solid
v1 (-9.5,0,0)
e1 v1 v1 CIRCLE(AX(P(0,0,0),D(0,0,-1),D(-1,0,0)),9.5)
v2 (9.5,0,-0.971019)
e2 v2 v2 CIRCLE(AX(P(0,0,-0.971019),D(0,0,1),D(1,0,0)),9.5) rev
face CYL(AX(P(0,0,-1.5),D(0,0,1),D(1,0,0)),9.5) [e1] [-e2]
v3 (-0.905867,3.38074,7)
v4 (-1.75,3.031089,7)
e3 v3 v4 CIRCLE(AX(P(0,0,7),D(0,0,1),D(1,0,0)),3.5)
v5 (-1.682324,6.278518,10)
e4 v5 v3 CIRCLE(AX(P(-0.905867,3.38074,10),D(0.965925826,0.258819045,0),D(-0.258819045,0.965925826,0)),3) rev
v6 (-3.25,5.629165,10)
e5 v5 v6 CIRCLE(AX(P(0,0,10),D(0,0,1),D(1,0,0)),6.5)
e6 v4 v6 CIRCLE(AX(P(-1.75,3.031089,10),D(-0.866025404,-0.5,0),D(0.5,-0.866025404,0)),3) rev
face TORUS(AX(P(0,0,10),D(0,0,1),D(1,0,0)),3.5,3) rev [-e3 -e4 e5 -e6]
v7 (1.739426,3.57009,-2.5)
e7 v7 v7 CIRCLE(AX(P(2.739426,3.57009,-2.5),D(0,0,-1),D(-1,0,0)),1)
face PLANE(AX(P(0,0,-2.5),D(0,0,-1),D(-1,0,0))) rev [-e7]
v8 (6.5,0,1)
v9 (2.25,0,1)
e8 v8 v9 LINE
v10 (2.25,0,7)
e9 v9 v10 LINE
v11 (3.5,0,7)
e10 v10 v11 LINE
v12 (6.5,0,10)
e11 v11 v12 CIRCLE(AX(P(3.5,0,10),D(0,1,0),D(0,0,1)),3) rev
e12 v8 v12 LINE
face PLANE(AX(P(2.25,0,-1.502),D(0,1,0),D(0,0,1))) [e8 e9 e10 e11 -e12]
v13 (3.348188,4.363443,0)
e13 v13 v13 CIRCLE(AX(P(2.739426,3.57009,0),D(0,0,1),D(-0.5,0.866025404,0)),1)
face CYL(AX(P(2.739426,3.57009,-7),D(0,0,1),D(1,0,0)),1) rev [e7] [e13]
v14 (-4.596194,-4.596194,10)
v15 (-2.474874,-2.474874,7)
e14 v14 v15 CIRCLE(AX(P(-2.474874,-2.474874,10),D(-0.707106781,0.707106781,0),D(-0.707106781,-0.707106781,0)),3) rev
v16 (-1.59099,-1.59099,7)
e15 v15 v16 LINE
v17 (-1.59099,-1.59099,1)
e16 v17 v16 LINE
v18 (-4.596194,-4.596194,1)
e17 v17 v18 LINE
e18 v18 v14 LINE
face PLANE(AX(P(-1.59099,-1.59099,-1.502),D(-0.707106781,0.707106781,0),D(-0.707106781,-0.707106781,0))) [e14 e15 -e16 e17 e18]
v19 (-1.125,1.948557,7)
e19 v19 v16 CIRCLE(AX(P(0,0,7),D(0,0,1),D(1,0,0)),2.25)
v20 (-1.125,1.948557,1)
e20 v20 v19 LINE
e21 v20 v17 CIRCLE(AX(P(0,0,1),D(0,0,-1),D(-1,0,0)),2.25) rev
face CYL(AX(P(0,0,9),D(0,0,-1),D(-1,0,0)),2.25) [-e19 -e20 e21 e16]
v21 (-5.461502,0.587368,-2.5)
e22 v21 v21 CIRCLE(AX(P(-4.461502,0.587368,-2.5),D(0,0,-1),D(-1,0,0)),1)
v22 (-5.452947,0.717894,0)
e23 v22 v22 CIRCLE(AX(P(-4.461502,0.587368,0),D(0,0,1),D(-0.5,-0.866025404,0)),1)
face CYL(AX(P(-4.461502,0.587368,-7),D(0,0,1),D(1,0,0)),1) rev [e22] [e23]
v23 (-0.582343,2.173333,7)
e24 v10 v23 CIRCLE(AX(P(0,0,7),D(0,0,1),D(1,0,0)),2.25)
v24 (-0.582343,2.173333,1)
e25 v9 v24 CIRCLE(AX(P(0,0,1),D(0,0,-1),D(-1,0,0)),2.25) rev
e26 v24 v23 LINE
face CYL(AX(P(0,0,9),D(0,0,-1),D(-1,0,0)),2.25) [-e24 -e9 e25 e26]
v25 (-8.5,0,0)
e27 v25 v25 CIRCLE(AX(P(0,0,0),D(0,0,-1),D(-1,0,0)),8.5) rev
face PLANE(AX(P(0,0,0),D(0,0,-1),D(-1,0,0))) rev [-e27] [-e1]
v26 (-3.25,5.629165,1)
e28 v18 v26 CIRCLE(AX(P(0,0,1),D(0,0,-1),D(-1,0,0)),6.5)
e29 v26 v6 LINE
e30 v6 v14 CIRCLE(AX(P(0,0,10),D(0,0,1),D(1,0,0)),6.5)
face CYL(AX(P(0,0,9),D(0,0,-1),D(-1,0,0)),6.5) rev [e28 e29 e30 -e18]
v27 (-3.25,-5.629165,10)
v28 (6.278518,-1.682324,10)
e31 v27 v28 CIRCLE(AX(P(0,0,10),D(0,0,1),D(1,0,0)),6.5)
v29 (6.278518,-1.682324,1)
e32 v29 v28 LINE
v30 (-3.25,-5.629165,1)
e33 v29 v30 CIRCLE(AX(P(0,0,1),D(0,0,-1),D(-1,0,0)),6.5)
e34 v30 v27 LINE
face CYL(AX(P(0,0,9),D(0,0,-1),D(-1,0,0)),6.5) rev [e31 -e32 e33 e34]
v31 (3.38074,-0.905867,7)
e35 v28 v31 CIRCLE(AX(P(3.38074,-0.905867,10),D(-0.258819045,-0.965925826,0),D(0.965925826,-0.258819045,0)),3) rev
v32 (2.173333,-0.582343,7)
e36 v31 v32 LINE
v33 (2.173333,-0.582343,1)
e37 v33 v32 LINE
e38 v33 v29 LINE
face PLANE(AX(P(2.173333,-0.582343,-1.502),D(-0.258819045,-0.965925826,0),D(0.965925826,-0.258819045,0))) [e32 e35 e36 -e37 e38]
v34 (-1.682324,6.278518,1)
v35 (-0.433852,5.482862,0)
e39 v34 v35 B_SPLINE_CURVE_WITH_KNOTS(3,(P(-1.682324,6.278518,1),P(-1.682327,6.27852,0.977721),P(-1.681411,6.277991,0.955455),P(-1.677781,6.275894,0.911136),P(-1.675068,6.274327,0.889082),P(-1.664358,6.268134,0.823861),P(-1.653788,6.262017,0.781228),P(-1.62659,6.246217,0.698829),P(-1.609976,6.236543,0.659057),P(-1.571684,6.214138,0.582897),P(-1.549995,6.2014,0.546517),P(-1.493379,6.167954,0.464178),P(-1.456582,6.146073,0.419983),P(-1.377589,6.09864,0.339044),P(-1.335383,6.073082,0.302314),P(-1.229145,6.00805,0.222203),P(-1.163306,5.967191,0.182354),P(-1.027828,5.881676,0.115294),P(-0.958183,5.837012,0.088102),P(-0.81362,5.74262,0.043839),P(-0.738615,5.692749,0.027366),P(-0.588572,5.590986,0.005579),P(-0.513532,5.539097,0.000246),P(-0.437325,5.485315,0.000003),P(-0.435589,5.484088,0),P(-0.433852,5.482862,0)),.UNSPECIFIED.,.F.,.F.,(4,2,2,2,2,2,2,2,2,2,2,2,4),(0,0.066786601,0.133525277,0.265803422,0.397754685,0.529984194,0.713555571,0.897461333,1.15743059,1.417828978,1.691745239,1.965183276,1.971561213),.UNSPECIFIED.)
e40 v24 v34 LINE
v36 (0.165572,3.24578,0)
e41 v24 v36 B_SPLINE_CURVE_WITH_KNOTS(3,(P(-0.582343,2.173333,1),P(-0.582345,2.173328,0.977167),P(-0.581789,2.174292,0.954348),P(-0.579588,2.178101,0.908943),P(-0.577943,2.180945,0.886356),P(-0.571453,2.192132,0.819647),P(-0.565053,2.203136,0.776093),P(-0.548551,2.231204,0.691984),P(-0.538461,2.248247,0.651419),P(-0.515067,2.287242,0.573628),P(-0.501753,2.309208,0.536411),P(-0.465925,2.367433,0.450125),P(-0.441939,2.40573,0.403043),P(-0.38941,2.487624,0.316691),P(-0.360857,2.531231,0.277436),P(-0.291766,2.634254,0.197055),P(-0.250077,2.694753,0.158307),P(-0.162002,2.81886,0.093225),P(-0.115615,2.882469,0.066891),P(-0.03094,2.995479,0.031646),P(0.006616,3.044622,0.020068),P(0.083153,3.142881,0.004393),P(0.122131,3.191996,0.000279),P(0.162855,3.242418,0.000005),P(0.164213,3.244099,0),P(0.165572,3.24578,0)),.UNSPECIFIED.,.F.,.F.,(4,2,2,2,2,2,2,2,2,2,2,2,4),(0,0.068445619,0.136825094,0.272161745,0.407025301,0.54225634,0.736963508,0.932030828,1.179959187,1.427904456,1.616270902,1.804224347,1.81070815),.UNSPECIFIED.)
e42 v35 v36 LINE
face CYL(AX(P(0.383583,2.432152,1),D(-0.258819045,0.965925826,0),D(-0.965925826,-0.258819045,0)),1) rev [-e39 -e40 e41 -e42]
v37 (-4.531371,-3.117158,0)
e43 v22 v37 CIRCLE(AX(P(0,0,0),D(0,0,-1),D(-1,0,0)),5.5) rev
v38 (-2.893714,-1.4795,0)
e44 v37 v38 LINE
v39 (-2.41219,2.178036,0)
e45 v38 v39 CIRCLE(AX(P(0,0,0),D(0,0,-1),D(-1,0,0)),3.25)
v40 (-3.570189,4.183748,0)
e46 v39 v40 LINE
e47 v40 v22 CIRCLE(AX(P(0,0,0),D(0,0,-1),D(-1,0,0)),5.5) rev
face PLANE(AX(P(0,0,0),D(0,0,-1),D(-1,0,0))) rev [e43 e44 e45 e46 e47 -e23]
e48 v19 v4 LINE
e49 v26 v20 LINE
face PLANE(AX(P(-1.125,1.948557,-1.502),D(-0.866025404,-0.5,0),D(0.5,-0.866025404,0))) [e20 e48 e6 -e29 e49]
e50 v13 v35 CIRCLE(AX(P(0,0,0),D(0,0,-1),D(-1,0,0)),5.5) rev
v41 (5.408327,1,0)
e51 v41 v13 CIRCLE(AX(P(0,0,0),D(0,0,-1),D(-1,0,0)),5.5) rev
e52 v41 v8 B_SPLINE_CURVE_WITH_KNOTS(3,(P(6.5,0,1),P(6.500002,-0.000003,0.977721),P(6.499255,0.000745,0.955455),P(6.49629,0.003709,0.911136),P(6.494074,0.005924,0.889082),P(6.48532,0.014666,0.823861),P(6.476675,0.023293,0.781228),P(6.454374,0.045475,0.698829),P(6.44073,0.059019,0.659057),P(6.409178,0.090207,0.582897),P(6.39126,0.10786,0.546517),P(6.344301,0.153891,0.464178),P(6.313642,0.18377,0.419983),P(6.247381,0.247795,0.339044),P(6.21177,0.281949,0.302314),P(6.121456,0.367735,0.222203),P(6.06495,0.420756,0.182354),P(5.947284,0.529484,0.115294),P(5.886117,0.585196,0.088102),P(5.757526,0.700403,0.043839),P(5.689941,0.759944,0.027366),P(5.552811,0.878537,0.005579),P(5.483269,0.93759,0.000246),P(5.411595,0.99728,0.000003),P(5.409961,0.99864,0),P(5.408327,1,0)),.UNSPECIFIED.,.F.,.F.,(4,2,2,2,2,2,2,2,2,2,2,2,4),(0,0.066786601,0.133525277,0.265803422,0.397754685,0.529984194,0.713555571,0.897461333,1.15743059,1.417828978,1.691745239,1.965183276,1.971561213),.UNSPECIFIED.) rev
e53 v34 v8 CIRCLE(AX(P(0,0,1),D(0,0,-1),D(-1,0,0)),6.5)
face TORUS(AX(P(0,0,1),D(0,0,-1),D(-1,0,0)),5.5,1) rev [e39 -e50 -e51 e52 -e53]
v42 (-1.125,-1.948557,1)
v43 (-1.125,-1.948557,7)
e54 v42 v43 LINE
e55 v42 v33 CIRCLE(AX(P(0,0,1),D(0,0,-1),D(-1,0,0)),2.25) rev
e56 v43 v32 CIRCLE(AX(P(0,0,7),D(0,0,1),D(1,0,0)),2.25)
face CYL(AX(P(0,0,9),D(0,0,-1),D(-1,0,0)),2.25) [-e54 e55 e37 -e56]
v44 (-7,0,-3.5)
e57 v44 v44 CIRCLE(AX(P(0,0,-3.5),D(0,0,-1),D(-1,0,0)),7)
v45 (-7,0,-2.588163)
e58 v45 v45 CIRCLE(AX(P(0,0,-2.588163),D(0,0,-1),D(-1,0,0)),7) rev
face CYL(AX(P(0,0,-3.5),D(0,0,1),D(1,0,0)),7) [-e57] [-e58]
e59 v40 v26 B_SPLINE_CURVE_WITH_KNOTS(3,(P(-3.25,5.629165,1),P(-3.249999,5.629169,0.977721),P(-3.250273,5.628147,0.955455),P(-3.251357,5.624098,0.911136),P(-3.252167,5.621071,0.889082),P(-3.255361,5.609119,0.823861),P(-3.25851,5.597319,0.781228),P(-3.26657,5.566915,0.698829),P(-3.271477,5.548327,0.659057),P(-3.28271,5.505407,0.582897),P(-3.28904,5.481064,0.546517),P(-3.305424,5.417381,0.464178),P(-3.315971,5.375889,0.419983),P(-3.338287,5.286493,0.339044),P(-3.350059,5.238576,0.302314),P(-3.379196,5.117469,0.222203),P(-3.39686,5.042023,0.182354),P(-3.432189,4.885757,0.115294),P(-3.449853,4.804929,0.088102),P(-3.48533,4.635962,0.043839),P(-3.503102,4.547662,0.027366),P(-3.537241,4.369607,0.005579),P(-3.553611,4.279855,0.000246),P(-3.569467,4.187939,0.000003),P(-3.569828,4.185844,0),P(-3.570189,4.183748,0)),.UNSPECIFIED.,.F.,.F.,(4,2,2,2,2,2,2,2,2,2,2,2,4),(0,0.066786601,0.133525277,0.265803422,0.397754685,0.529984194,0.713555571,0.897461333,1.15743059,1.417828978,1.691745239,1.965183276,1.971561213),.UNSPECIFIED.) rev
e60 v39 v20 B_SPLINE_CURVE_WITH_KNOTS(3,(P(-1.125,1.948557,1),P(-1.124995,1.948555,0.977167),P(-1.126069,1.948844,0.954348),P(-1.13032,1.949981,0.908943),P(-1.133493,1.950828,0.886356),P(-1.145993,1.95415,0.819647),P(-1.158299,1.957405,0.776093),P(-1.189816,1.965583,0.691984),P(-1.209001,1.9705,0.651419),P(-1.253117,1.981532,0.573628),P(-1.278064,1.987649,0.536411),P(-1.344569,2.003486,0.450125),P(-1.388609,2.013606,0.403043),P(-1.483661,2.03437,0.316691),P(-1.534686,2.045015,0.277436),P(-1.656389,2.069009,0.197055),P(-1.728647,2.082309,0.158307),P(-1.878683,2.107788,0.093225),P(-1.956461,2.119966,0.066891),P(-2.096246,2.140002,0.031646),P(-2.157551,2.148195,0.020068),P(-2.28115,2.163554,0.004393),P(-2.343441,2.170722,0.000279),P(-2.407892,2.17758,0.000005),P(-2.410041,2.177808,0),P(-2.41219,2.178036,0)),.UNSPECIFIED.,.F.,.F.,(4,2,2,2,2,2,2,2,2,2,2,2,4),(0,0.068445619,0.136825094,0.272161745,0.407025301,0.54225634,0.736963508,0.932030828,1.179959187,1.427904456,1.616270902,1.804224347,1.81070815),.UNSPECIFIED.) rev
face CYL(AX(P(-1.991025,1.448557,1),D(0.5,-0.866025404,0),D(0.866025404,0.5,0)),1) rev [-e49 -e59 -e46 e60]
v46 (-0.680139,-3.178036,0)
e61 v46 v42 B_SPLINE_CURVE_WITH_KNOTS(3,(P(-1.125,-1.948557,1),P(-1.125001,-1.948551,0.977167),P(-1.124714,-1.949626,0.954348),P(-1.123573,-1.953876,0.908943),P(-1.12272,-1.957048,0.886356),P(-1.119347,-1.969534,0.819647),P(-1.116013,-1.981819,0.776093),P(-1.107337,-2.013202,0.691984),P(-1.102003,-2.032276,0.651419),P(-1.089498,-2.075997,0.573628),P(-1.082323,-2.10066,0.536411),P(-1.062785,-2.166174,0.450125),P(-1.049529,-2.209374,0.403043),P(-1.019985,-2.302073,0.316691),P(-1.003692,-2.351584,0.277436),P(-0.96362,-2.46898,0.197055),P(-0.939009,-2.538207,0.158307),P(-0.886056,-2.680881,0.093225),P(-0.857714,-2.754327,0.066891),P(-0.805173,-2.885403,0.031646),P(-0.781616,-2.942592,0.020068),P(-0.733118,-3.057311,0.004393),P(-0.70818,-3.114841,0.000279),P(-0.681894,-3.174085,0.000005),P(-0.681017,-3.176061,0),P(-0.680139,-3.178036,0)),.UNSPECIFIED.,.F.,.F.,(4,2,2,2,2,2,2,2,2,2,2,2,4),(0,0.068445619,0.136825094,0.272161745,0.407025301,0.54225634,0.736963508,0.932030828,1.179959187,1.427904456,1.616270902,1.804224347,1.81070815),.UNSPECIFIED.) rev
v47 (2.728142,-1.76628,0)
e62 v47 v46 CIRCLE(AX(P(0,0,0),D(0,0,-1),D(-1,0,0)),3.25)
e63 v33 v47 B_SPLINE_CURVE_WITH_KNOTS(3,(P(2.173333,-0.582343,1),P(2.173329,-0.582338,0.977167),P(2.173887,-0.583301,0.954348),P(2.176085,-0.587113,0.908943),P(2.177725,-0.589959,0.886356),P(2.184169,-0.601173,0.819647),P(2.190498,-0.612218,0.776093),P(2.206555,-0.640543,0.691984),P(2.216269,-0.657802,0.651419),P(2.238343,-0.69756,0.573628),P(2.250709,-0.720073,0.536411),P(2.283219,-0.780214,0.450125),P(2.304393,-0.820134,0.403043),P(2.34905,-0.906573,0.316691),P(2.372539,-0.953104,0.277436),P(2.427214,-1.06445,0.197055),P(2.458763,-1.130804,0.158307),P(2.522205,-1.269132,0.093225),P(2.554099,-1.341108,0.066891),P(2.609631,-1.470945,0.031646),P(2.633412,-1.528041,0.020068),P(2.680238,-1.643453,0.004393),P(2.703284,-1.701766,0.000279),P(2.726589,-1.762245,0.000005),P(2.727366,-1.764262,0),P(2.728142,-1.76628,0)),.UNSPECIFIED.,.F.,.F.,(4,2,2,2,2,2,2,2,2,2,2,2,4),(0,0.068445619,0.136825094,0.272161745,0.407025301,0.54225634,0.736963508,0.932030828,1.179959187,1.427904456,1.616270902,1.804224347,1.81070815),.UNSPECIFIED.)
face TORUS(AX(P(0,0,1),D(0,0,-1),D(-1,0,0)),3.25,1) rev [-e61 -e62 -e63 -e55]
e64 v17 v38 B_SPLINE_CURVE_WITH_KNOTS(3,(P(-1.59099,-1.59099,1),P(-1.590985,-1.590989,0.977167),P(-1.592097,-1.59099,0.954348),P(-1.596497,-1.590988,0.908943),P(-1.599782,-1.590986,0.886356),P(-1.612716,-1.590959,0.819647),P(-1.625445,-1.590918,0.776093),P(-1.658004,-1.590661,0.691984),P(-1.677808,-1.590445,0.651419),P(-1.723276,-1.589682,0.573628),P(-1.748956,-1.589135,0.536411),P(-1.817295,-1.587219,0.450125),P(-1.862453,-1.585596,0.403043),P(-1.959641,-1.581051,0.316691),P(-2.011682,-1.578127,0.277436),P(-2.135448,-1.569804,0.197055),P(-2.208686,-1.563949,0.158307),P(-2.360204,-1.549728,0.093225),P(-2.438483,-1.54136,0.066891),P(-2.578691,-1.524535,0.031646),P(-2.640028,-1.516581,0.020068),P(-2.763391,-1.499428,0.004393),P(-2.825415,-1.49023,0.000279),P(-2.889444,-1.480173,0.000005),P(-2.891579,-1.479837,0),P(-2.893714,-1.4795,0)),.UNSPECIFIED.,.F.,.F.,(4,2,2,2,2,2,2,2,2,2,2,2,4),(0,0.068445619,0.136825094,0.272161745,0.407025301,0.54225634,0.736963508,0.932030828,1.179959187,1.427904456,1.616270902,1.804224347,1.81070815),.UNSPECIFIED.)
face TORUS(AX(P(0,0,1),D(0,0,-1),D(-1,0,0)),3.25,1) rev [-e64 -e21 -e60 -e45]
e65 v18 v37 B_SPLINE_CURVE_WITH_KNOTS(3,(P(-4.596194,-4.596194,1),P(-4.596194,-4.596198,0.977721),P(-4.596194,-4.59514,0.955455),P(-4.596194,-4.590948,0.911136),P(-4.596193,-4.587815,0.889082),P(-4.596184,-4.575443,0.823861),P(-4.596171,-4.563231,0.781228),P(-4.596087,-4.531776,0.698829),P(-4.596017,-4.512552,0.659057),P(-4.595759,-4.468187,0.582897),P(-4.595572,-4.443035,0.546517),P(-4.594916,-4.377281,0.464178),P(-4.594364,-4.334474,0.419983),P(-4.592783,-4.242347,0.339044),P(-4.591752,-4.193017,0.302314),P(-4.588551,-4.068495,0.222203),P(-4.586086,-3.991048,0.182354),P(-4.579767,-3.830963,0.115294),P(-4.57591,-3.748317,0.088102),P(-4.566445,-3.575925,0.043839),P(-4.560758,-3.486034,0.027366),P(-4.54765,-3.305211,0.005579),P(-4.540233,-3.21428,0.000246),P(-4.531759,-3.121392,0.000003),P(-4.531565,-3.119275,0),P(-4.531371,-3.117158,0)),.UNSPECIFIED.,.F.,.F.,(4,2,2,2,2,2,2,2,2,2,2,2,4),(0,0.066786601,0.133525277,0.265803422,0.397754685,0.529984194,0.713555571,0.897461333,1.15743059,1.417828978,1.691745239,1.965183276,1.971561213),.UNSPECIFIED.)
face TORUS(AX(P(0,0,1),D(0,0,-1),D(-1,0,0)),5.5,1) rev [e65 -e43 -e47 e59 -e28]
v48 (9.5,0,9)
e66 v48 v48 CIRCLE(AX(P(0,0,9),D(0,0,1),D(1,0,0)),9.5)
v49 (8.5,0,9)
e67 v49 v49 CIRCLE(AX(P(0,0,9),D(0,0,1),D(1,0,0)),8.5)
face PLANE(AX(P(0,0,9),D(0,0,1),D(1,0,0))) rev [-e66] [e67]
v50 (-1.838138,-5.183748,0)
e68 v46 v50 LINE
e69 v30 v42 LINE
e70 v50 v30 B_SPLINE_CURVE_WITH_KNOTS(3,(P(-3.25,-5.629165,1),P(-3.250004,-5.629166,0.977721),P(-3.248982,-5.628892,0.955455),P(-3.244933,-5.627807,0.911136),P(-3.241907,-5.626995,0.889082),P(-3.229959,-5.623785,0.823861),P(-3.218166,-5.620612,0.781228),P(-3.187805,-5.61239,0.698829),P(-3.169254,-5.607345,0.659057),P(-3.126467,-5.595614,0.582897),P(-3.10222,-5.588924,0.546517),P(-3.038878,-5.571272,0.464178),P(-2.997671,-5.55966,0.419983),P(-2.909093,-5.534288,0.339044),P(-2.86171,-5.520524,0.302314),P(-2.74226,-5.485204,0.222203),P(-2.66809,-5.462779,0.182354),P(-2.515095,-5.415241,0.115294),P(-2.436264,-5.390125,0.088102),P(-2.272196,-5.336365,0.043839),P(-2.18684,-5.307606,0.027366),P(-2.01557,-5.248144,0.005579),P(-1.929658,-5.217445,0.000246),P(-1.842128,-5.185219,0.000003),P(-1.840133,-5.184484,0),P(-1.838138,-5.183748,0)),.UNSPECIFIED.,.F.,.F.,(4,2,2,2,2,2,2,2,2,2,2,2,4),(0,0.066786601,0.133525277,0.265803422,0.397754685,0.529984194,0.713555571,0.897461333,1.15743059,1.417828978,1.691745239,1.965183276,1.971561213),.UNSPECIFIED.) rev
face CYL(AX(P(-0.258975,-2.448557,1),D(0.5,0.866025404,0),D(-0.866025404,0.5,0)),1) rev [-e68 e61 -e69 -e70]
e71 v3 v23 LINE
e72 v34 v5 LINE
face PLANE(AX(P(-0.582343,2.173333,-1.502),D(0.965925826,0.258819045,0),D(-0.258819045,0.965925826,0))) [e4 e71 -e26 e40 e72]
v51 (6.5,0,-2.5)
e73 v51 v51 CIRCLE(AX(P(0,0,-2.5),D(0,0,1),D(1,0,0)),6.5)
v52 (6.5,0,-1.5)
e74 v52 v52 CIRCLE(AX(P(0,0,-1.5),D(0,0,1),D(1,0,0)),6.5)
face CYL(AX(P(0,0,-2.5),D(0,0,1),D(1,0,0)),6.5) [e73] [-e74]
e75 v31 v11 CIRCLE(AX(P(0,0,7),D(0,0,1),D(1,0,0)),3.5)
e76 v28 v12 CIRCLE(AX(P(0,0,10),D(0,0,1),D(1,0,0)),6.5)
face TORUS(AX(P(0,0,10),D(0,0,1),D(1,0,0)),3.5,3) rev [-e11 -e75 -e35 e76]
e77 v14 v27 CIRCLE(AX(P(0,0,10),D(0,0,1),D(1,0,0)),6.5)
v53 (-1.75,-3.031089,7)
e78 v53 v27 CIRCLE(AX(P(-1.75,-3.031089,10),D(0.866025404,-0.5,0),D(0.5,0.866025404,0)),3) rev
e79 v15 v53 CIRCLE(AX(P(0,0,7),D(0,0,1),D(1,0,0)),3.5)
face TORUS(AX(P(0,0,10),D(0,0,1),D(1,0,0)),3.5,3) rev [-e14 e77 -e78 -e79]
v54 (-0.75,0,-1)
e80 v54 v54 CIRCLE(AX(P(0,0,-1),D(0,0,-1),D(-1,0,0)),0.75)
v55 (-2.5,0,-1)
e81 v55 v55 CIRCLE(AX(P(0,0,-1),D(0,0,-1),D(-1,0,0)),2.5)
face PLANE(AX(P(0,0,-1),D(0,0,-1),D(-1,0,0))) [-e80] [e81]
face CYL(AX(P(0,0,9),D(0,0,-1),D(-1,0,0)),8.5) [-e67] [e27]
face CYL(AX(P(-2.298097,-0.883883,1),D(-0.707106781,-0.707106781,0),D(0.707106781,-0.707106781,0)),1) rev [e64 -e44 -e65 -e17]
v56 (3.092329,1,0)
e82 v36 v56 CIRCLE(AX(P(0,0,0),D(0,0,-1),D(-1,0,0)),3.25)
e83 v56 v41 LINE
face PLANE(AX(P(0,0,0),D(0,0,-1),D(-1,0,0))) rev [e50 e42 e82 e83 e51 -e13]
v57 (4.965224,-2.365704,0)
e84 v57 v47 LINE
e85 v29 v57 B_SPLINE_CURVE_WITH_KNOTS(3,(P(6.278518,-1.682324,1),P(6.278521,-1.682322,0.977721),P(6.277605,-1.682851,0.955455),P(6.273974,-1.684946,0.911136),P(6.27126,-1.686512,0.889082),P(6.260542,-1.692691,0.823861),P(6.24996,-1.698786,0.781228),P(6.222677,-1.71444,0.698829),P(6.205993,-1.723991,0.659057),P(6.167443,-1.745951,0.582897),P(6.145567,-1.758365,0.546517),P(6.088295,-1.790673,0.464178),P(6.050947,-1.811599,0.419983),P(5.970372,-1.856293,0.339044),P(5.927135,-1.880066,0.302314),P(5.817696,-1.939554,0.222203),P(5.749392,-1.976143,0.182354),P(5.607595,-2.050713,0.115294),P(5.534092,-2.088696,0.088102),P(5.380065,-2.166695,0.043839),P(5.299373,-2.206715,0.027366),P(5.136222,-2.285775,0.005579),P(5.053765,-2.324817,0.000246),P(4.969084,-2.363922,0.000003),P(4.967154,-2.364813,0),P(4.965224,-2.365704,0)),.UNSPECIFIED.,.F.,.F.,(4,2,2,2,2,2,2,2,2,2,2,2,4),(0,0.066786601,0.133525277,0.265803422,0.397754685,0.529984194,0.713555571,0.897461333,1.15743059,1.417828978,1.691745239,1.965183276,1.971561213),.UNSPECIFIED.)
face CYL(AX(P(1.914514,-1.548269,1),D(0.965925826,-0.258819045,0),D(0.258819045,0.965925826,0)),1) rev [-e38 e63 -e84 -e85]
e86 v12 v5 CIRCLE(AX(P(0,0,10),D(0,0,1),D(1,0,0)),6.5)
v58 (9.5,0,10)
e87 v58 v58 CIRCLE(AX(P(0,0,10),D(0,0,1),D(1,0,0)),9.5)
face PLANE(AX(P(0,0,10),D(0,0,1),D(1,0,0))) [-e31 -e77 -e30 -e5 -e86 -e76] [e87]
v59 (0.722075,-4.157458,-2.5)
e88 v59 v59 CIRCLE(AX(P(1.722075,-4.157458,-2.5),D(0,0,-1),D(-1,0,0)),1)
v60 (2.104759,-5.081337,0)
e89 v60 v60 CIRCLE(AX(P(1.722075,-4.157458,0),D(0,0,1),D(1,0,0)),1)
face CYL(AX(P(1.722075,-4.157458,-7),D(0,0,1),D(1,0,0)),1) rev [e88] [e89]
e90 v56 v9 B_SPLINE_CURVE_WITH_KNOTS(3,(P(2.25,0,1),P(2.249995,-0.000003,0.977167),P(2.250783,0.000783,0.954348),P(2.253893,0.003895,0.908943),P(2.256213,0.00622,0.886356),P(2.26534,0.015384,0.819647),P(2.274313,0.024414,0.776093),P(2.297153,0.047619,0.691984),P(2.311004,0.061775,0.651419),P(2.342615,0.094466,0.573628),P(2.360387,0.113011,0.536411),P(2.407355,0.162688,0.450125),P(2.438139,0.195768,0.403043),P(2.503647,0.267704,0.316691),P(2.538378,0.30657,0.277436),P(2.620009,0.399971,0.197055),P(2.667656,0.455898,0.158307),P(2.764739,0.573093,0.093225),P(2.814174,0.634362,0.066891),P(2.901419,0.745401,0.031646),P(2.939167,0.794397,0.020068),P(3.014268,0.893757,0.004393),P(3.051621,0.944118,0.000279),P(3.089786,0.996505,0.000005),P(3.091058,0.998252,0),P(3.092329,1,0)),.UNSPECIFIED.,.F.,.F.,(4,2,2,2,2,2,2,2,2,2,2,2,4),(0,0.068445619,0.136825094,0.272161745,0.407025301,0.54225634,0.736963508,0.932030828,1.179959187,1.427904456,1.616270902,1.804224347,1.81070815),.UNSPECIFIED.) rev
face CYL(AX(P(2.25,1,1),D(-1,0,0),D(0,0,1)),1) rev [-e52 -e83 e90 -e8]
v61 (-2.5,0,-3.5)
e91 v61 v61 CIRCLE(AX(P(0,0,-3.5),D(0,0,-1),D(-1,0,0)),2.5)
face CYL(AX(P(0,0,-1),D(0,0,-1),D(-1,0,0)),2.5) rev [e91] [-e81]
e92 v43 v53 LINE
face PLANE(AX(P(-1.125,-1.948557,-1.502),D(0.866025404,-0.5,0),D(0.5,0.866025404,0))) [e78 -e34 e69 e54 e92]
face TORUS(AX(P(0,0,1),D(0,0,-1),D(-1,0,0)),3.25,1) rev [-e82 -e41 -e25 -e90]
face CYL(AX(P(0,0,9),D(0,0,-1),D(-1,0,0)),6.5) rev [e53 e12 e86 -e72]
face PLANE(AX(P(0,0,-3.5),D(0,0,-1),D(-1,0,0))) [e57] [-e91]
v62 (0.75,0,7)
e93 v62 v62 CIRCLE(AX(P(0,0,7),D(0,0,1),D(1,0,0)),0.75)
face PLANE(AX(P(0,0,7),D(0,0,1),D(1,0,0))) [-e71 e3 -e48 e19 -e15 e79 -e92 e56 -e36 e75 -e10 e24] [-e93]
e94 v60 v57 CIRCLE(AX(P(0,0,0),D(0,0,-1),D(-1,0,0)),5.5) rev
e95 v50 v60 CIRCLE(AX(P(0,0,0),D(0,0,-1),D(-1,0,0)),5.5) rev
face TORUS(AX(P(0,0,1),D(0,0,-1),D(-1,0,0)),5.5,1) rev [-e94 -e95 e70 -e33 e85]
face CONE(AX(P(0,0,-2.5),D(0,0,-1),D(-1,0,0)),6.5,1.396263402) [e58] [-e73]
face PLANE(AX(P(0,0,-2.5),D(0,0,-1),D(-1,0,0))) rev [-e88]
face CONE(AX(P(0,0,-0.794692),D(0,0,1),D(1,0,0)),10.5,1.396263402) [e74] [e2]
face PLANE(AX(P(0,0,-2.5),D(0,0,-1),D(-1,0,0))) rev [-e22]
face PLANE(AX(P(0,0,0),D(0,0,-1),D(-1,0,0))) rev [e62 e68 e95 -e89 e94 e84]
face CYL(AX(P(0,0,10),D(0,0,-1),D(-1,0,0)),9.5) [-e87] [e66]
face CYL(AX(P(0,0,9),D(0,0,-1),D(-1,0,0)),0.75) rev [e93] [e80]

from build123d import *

# Parameters (mm, degrees)
SKETCH1_R             = 8.5
SKETCH1_R_2           = 6.5
BOSS_EXTRUDE1_DEPTH   = 9
SKETCH1_R_3           = 2.25
SKETCH1_R_4           = 0.75
BOSS_EXTRUDE1_2_DEPTH = 9
SKETCH2_R             = 9.5
BOSS_EXTRUDE2_DEPTH   = 1.5
SKETCH3_R             = 9.5
SKETCH3_R_2           = 6.5
BOSS_EXTRUDE3_DEPTH   = 1
BOSS_EXTRUDE4_REACH   = 19.051
CIRPATTERN1_COUNT     = 3
CUT_EXTRUDE2_START    = -2
SKETCH6_R             = 6.5
CUT_EXTRUDE2_DEPTH    = 2
FILLET1_R             = 3
BOSS_EXTRUDE5_START   = 1
SKETCH8_R             = 6.5
BOSS_EXTRUDE5_DEPTH   = 1
SKETCH7_R             = 1
CUT_EXTRUDE3_DEPTH    = 7
CIRPATTERN2_COUNT     = 3
FILLET2_R             = 1
SKETCH10_R            = 7
BOSS_EXTRUDE6_DEPTH   = 1
CUT_EXTRUDE5_START    = -14.5
SKETCH12_R            = 0.75
CUT_EXTRUDE5_DEPTH    = 14.5
SKETCH13_R            = 2.5
CUT_EXTRUDE6_DEPTH    = 2.5


with BuildPart() as part:
    # Sketch1 → Boss-Extrude1 (new body)
    with BuildSketch(Plane.XY):
        Circle(SKETCH1_R)
        Circle(SKETCH1_R_2, mode=Mode.SUBTRACT)
    extrude(amount=BOSS_EXTRUDE1_DEPTH)



with BuildPart() as body_2:
    # Sketch1 → Boss-Extrude1 2 (new body)
    with BuildSketch(Plane.XY):
        Circle(SKETCH1_R_3)
        Circle(SKETCH1_R_4, mode=Mode.SUBTRACT)
    extrude(amount=BOSS_EXTRUDE1_2_DEPTH)


with BuildPart() as part_1:
    add(part.part)

    add(body_2.part)  # Boss-Extrude2 merges body 2
    # Sketch2 → Boss-Extrude2 (add)
    with BuildSketch(Plane(origin=(0, 0, 0), x_dir=(-1, 0, 0), z_dir=(0, 0, -1))):
        Circle(SKETCH2_R)
    extrude(amount=BOSS_EXTRUDE2_DEPTH)

    # Sketch3 → Boss-Extrude3 (add)
    with BuildSketch(Plane.XY.offset(9)):
        Circle(SKETCH3_R)
        Circle(SKETCH3_R_2, mode=Mode.SUBTRACT)
    extrude(amount=BOSS_EXTRUDE3_DEPTH)

    # Sketch5 → Boss-Extrude4 (add, up to next)
    with BuildSketch(Plane.XY.offset(9), mode=Mode.PRIVATE) as boss_extrude4_sk1:
        with BuildLine():
            Line((2.25, 0), (6.5, 0))
            ThreePointArc((6.5, 0), (6.444391599, -0.848420249), (6.278517871, -1.682323793))
            Line((6.278517871, -1.682323793), (2.173333109, -0.582342851))
            ThreePointArc((2.173333109, -0.582342851), (2.230750938, -0.293683932), (2.25, 0))
        make_face()
    boss_extrude4_tool1 = extrude(boss_extrude4_sk1.sketch, amount=-BOSS_EXTRUDE4_REACH, mode=Mode.PRIVATE) - part_1.part
    boss_extrude4 = boss_extrude4_tool1.solids().sort_by_distance((4.665326, -0.614202, 9))[0]
    add(boss_extrude4)

    # CirPattern1: Boss-Extrude4 ×3 about axis
    cirpattern1_axis = Axis((0, 0, 0), (0, 0, 1))
    for i in range(1, CIRPATTERN1_COUNT):
        add(boss_extrude4.rotate(cirpattern1_axis, i * 360 / CIRPATTERN1_COUNT))

    # Sketch6 → Cut-Extrude2 (cut)
    with BuildSketch(Plane.XY.offset(9).offset(CUT_EXTRUDE2_START)):
        Circle(SKETCH6_R)
    extrude(amount=CUT_EXTRUDE2_DEPTH, mode=Mode.SUBTRACT)

    # Fillet1
    # the kernel refuses this fillet: 3 mm, written as the material it adds along each edge
    with BuildSketch(Plane(origin=(0, 0, 7), x_dir=(0.9659258262890711, -0.2588190451025104, 0), z_dir=(-0.2588190451025104, -0.9659258262890711, 0))) as fillet1_piece_1:
        with BuildLine():
            CenterArc((6.5 - FILLET1_R, FILLET1_R), FILLET1_R, 270, 90)
            Line((6.5 - FILLET1_R, 0), (6.5, 0))
            Line((6.5, 0), (6.5, FILLET1_R))
        make_face()
    revolve(axis=Axis((0, 0, 7), (0, 0, 1)), revolution_arc=15)
    with BuildSketch(Plane(origin=(0, 0, 7), x_dir=(-0.2588190451025142, 0.9659258262890701, 0), z_dir=(0.9659258262890701, 0.2588190451025142, 0))) as fillet1_piece_2:
        with BuildLine():
            CenterArc((6.5 - FILLET1_R, FILLET1_R), FILLET1_R, 270, 90)
            Line((6.5 - FILLET1_R, 0), (6.5, 0))
            Line((6.5, 0), (6.5, FILLET1_R))
        make_face()
    revolve(axis=Axis((0, 0, 7), (0, 0, 1)), revolution_arc=15)
    with BuildSketch(Plane(origin=(0, 0, 7), x_dir=(-0.7071067811865505, -0.7071067811865446, 0), z_dir=(-0.7071067811865446, 0.7071067811865505, 0))) as fillet1_piece_3:
        with BuildLine():
            CenterArc((6.5 - FILLET1_R, FILLET1_R), FILLET1_R, 270, 90)
            Line((6.5 - FILLET1_R, 0), (6.5, 0))
            Line((6.5, 0), (6.5, FILLET1_R))
        make_face()
    revolve(axis=Axis((0, 0, 7), (0, 0, 1)), revolution_arc=15)

    # Sketch8 → Boss-Extrude5 (add)
    with BuildSketch(Plane(origin=(0, 0, -1.5), x_dir=(-1, 0, 0), z_dir=(0, 0, -1)).offset(BOSS_EXTRUDE5_START)):
        Circle(SKETCH8_R)
    extrude(amount=-BOSS_EXTRUDE5_DEPTH)

    # Sketch7 → Cut-Extrude3 (cut)
    with BuildSketch(Plane.XY):
        with Locations((1.722075446, -4.157457896)):
            Circle(SKETCH7_R)
    cut_extrude3 = extrude(amount=-CUT_EXTRUDE3_DEPTH, mode=Mode.SUBTRACT)

    # CirPattern2: Cut-Extrude3 ×3 about axis
    cirpattern2_axis = Axis((0, 0, 0), (0, 0, 1))
    for i in range(1, CIRPATTERN2_COUNT):
        add(cut_extrude3.rotate(cirpattern2_axis, i * 360 / CIRPATTERN2_COUNT), mode=Mode.SUBTRACT)

    # Fillet2
    # the kernel refuses this fillet: 1 mm, written as the material it adds along each edge
    with BuildSketch(Plane(origin=(0, 0, 0), x_dir=(0.9268638778365579, -0.37539759184333915, 0), z_dir=(-0.37539759184333915, -0.9268638778365579, 0))) as fillet2_piece_1:
        with BuildLine():
            CenterArc((6.5 - FILLET2_R, FILLET2_R), FILLET2_R, 270, 90)
            Line((6.5 - FILLET2_R, 0), (6.5, 0))
            Line((6.5, 0), (6.5, FILLET2_R))
        make_face()
    revolve(axis=Axis((0, 0, 0), (0, 0, 1)), revolution_arc=149.097777135)
    with BuildSketch(Plane(origin=(-0.25, 0, 0), x_dir=(0, 0, 1), z_dir=(1, 0, 0))) as fillet2_piece_2_section:
        with BuildLine():
            CenterArc((FILLET2_R, -FILLET2_R), FILLET2_R, 90, 90)
            Line((0, -FILLET2_R), (0, 0))
            Line((0, 0), (FILLET2_R, 0))
        make_face()
    fillet2_piece_2 = extrude(amount=9.25, mode=Mode.PRIVATE)
    fillet2_piece_2 = fillet2_piece_2 - Plane(origin=(0, 0, 0.222961637), x_dir=(1, 0, 0), z_dir=(0, 0, -1)) * Cylinder(0.75, 23, mode=Mode.PRIVATE)
    fillet2_piece_2 = fillet2_piece_2 & Plane(origin=(0, 0, 0.222961637), x_dir=(1, 0, 0), z_dir=(0, 0, -1)) * Cylinder(8.5, 23, mode=Mode.PRIVATE)
    add(fillet2_piece_2)
    with BuildSketch(Plane(origin=(8.693332437, -2.329371406, 0), x_dir=(0, 0, 1), z_dir=(-0.9659258262890682, 0.25881904510252135, 0))) as fillet2_piece_3_section:
        with BuildLine():
            CenterArc((FILLET2_R, -FILLET2_R), FILLET2_R, 90, 90)
            Line((0, -FILLET2_R), (0, 0))
            Line((0, 0), (FILLET2_R, 0))
        make_face()
    fillet2_piece_3 = extrude(amount=9.25, mode=Mode.PRIVATE)
    fillet2_piece_3 = fillet2_piece_3 - Plane(origin=(0, 0, 0.222961624), x_dir=(1, 0, 0), z_dir=(0, 0, -1)) * Cylinder(0.75, 23, mode=Mode.PRIVATE)
    fillet2_piece_3 = fillet2_piece_3 & Plane(origin=(0, 0, 0.222961624), x_dir=(1, 0, 0), z_dir=(0, 0, -1)) * Cylinder(8.5, 23, mode=Mode.PRIVATE)
    add(fillet2_piece_3)
    with BuildSketch(Plane(origin=(0, 0, 0), x_dir=(-0.138328087862445, 0.9903864599782852, 0), z_dir=(0.9903864599782852, 0.138328087862445, 0))) as fillet2_piece_4:
        with BuildLine():
            CenterArc((6.5 - FILLET2_R, FILLET2_R), FILLET2_R, 270, 90)
            Line((6.5 - FILLET2_R, 0), (6.5, 0))
            Line((6.5, 0), (6.5, FILLET2_R))
        make_face()
    revolve(axis=Axis((0, 0, 0), (0, 0, 1)), revolution_arc=149.097777135)
    with BuildSketch(Plane(origin=(0, 0, 0), x_dir=(0.5547978045957125, 0.8319852138204006, 0), z_dir=(0.8319852138204006, -0.5547978045957125, 0))) as fillet2_piece_5:
        with BuildLine():
            CenterArc((2.25 + FILLET2_R, FILLET2_R), FILLET2_R, 180, 90)
            Line((2.25 + FILLET2_R, 0), (2.25, 0))
            Line((2.25, 0), (2.25, FILLET2_R))
        make_face()
    revolve(axis=Axis((0, 0, 0), (0, 0, 1)), revolution_arc=232.393578389)
    with BuildSketch(Plane(origin=(0.125, -0.216506351, 0), x_dir=(0, 0, 1), z_dir=(-0.49999999999999983, 0.8660254037844388, 0))) as fillet2_piece_6_section:
        with BuildLine():
            CenterArc((FILLET2_R, -FILLET2_R), FILLET2_R, 90, 90)
            Line((0, -FILLET2_R), (0, 0))
            Line((0, 0), (FILLET2_R, 0))
        make_face()
    fillet2_piece_6 = extrude(amount=9.25, mode=Mode.PRIVATE)
    fillet2_piece_6 = fillet2_piece_6 - Plane(origin=(0, 0, 0.222961635), x_dir=(1, 0, 0), z_dir=(0, 0, -1)) * Cylinder(0.75, 23, mode=Mode.PRIVATE)
    fillet2_piece_6 = fillet2_piece_6 & Plane(origin=(0, 0, 0.222961635), x_dir=(1, 0, 0), z_dir=(0, 0, -1)) * Cylinder(8.5, 23, mode=Mode.PRIVATE)
    add(fillet2_piece_6)
    with BuildSketch(Plane(origin=(-2.329371406, 8.693332437, 0), x_dir=(0, 0, 1), z_dir=(0.25881904510251996, -0.9659258262890685, 0))) as fillet2_piece_7_section:
        with BuildLine():
            CenterArc((FILLET2_R, -FILLET2_R), FILLET2_R, 90, 90)
            Line((0, -FILLET2_R), (0, 0))
            Line((0, 0), (FILLET2_R, 0))
        make_face()
    fillet2_piece_7 = extrude(amount=9.25, mode=Mode.PRIVATE)
    fillet2_piece_7 = fillet2_piece_7 - Plane(origin=(0, 0, 0.222961632), x_dir=(1, 0, 0), z_dir=(0, 0, -1)) * Cylinder(0.75, 23, mode=Mode.PRIVATE)
    fillet2_piece_7 = fillet2_piece_7 & Plane(origin=(0, 0, 0.222961632), x_dir=(1, 0, 0), z_dir=(0, 0, -1)) * Cylinder(8.5, 23, mode=Mode.PRIVATE)
    add(fillet2_piece_7)
    with BuildSketch(Plane(origin=(0, 0, 0), x_dir=(-0.7885357899741134, -0.614988868134945, 0), z_dir=(-0.614988868134945, 0.7885357899741134, 0))) as fillet2_piece_8:
        with BuildLine():
            CenterArc((6.5 - FILLET2_R, FILLET2_R), FILLET2_R, 270, 90)
            Line((6.5 - FILLET2_R, 0), (6.5, 0))
            Line((6.5, 0), (6.5, FILLET2_R))
        make_face()
    revolve(axis=Axis((0, 0, 0), (0, 0, 1)), revolution_arc=149.097777135)
    with BuildSketch(Plane(origin=(0, 0, 0), x_dir=(-0.9979192330393512, 0.06447638583352278, 0), z_dir=(0.06447638583352278, 0.9979192330393512, 0))) as fillet2_piece_9:
        with BuildLine():
            CenterArc((2.25 + FILLET2_R, FILLET2_R), FILLET2_R, 180, 90)
            Line((2.25 + FILLET2_R, 0), (2.25, 0))
            Line((2.25, 0), (2.25, FILLET2_R))
        make_face()
    revolve(axis=Axis((0, 0, 0), (0, 0, 1)), revolution_arc=232.393578389)
    with BuildSketch(Plane(origin=(0.125, 0.216506351, 0), x_dir=(0, 0, 1), z_dir=(-0.5000000000000004, -0.8660254037844384, 0))) as fillet2_piece_10_section:
        with BuildLine():
            CenterArc((FILLET2_R, -FILLET2_R), FILLET2_R, 90, 90)
            Line((0, -FILLET2_R), (0, 0))
            Line((0, 0), (FILLET2_R, 0))
        make_face()
    fillet2_piece_10 = extrude(amount=9.25, mode=Mode.PRIVATE)
    fillet2_piece_10 = fillet2_piece_10 - Plane(origin=(0, 0, 0.222961664), x_dir=(1, 0, 0), z_dir=(0, 0, -1)) * Cylinder(0.75, 23, mode=Mode.PRIVATE)
    fillet2_piece_10 = fillet2_piece_10 & Plane(origin=(0, 0, 0.222961664), x_dir=(1, 0, 0), z_dir=(0, 0, -1)) * Cylinder(8.5, 23, mode=Mode.PRIVATE)
    add(fillet2_piece_10)
    with BuildSketch(Plane(origin=(-6.363961031, -6.363961031, 0), x_dir=(0, 0, 1), z_dir=(0.7071067811865483, 0.7071067811865468, 0))) as fillet2_piece_11_section:
        with BuildLine():
            CenterArc((FILLET2_R, -FILLET2_R), FILLET2_R, 90, 90)
            Line((0, -FILLET2_R), (0, 0))
            Line((0, 0), (FILLET2_R, 0))
        make_face()
    fillet2_piece_11 = extrude(amount=9.25, mode=Mode.PRIVATE)
    fillet2_piece_11 = fillet2_piece_11 - Plane(origin=(0, 0, 0.22296162), x_dir=(1, 0, 0), z_dir=(0, 0, -1)) * Cylinder(0.75, 23, mode=Mode.PRIVATE)
    fillet2_piece_11 = fillet2_piece_11 & Plane(origin=(0, 0, 0.22296162), x_dir=(1, 0, 0), z_dir=(0, 0, -1)) * Cylinder(8.5, 23, mode=Mode.PRIVATE)
    add(fillet2_piece_11)
    with BuildSketch(Plane(origin=(0, 0, 0), x_dir=(0.44312142844363894, -0.8964615996539222, 0), z_dir=(-0.8964615996539222, -0.44312142844363894, 0))) as fillet2_piece_12:
        with BuildLine():
            CenterArc((2.25 + FILLET2_R, FILLET2_R), FILLET2_R, 180, 90)
            Line((2.25 + FILLET2_R, 0), (2.25, 0))
            Line((2.25, 0), (2.25, FILLET2_R))
        make_face()
    revolve(axis=Axis((0, 0, 0), (0, 0, 1)), revolution_arc=232.393578389)

    # Sketch10 → Boss-Extrude6 (add)
    with BuildSketch(Plane(origin=(0, 0, -2.5), x_dir=(-1, 0, 0), z_dir=(0, 0, -1))):
        Circle(SKETCH10_R)
    extrude(amount=BOSS_EXTRUDE6_DEPTH)

    # Sketch11 → Cut-Revolve1 (revolve, cut)
    with BuildSketch(Plane(origin=(0, 0, 0), x_dir=(1, 0, 0), z_dir=(0, 1, 0)), mode=Mode.PRIVATE) as cut_revolve1_sk:
        Polygon((-6.5, 2.5), (-10.5, 3.205307923), (-10.5, 0.794692077), (-6.5, 1.5), align=None)
    revolve(cut_revolve1_sk.sketch.rotate(Axis((0, 0, 0), (0, 0, -1)), 180), axis=Axis((0, 0, 0), (0, 0, -1)), mode=Mode.SUBTRACT)

    # Sketch12 → Cut-Extrude5 (cut)
    with BuildSketch(Plane.XY.offset(7).offset(CUT_EXTRUDE5_START)):
        with Locations(Location((0, 0, 0), (0, 0, 180))):
            Circle(SKETCH12_R)
    extrude(amount=CUT_EXTRUDE5_DEPTH, mode=Mode.SUBTRACT)

    # Sketch13 → Cut-Extrude6 (cut)
    with BuildSketch(Plane(origin=(0, 0, -3.5), x_dir=(-1, 0, 0), z_dir=(0, 0, -1))):
        Circle(SKETCH13_R)
    extrude(amount=-CUT_EXTRUDE6_DEPTH, mode=Mode.SUBTRACT)


solid = part_1.part
